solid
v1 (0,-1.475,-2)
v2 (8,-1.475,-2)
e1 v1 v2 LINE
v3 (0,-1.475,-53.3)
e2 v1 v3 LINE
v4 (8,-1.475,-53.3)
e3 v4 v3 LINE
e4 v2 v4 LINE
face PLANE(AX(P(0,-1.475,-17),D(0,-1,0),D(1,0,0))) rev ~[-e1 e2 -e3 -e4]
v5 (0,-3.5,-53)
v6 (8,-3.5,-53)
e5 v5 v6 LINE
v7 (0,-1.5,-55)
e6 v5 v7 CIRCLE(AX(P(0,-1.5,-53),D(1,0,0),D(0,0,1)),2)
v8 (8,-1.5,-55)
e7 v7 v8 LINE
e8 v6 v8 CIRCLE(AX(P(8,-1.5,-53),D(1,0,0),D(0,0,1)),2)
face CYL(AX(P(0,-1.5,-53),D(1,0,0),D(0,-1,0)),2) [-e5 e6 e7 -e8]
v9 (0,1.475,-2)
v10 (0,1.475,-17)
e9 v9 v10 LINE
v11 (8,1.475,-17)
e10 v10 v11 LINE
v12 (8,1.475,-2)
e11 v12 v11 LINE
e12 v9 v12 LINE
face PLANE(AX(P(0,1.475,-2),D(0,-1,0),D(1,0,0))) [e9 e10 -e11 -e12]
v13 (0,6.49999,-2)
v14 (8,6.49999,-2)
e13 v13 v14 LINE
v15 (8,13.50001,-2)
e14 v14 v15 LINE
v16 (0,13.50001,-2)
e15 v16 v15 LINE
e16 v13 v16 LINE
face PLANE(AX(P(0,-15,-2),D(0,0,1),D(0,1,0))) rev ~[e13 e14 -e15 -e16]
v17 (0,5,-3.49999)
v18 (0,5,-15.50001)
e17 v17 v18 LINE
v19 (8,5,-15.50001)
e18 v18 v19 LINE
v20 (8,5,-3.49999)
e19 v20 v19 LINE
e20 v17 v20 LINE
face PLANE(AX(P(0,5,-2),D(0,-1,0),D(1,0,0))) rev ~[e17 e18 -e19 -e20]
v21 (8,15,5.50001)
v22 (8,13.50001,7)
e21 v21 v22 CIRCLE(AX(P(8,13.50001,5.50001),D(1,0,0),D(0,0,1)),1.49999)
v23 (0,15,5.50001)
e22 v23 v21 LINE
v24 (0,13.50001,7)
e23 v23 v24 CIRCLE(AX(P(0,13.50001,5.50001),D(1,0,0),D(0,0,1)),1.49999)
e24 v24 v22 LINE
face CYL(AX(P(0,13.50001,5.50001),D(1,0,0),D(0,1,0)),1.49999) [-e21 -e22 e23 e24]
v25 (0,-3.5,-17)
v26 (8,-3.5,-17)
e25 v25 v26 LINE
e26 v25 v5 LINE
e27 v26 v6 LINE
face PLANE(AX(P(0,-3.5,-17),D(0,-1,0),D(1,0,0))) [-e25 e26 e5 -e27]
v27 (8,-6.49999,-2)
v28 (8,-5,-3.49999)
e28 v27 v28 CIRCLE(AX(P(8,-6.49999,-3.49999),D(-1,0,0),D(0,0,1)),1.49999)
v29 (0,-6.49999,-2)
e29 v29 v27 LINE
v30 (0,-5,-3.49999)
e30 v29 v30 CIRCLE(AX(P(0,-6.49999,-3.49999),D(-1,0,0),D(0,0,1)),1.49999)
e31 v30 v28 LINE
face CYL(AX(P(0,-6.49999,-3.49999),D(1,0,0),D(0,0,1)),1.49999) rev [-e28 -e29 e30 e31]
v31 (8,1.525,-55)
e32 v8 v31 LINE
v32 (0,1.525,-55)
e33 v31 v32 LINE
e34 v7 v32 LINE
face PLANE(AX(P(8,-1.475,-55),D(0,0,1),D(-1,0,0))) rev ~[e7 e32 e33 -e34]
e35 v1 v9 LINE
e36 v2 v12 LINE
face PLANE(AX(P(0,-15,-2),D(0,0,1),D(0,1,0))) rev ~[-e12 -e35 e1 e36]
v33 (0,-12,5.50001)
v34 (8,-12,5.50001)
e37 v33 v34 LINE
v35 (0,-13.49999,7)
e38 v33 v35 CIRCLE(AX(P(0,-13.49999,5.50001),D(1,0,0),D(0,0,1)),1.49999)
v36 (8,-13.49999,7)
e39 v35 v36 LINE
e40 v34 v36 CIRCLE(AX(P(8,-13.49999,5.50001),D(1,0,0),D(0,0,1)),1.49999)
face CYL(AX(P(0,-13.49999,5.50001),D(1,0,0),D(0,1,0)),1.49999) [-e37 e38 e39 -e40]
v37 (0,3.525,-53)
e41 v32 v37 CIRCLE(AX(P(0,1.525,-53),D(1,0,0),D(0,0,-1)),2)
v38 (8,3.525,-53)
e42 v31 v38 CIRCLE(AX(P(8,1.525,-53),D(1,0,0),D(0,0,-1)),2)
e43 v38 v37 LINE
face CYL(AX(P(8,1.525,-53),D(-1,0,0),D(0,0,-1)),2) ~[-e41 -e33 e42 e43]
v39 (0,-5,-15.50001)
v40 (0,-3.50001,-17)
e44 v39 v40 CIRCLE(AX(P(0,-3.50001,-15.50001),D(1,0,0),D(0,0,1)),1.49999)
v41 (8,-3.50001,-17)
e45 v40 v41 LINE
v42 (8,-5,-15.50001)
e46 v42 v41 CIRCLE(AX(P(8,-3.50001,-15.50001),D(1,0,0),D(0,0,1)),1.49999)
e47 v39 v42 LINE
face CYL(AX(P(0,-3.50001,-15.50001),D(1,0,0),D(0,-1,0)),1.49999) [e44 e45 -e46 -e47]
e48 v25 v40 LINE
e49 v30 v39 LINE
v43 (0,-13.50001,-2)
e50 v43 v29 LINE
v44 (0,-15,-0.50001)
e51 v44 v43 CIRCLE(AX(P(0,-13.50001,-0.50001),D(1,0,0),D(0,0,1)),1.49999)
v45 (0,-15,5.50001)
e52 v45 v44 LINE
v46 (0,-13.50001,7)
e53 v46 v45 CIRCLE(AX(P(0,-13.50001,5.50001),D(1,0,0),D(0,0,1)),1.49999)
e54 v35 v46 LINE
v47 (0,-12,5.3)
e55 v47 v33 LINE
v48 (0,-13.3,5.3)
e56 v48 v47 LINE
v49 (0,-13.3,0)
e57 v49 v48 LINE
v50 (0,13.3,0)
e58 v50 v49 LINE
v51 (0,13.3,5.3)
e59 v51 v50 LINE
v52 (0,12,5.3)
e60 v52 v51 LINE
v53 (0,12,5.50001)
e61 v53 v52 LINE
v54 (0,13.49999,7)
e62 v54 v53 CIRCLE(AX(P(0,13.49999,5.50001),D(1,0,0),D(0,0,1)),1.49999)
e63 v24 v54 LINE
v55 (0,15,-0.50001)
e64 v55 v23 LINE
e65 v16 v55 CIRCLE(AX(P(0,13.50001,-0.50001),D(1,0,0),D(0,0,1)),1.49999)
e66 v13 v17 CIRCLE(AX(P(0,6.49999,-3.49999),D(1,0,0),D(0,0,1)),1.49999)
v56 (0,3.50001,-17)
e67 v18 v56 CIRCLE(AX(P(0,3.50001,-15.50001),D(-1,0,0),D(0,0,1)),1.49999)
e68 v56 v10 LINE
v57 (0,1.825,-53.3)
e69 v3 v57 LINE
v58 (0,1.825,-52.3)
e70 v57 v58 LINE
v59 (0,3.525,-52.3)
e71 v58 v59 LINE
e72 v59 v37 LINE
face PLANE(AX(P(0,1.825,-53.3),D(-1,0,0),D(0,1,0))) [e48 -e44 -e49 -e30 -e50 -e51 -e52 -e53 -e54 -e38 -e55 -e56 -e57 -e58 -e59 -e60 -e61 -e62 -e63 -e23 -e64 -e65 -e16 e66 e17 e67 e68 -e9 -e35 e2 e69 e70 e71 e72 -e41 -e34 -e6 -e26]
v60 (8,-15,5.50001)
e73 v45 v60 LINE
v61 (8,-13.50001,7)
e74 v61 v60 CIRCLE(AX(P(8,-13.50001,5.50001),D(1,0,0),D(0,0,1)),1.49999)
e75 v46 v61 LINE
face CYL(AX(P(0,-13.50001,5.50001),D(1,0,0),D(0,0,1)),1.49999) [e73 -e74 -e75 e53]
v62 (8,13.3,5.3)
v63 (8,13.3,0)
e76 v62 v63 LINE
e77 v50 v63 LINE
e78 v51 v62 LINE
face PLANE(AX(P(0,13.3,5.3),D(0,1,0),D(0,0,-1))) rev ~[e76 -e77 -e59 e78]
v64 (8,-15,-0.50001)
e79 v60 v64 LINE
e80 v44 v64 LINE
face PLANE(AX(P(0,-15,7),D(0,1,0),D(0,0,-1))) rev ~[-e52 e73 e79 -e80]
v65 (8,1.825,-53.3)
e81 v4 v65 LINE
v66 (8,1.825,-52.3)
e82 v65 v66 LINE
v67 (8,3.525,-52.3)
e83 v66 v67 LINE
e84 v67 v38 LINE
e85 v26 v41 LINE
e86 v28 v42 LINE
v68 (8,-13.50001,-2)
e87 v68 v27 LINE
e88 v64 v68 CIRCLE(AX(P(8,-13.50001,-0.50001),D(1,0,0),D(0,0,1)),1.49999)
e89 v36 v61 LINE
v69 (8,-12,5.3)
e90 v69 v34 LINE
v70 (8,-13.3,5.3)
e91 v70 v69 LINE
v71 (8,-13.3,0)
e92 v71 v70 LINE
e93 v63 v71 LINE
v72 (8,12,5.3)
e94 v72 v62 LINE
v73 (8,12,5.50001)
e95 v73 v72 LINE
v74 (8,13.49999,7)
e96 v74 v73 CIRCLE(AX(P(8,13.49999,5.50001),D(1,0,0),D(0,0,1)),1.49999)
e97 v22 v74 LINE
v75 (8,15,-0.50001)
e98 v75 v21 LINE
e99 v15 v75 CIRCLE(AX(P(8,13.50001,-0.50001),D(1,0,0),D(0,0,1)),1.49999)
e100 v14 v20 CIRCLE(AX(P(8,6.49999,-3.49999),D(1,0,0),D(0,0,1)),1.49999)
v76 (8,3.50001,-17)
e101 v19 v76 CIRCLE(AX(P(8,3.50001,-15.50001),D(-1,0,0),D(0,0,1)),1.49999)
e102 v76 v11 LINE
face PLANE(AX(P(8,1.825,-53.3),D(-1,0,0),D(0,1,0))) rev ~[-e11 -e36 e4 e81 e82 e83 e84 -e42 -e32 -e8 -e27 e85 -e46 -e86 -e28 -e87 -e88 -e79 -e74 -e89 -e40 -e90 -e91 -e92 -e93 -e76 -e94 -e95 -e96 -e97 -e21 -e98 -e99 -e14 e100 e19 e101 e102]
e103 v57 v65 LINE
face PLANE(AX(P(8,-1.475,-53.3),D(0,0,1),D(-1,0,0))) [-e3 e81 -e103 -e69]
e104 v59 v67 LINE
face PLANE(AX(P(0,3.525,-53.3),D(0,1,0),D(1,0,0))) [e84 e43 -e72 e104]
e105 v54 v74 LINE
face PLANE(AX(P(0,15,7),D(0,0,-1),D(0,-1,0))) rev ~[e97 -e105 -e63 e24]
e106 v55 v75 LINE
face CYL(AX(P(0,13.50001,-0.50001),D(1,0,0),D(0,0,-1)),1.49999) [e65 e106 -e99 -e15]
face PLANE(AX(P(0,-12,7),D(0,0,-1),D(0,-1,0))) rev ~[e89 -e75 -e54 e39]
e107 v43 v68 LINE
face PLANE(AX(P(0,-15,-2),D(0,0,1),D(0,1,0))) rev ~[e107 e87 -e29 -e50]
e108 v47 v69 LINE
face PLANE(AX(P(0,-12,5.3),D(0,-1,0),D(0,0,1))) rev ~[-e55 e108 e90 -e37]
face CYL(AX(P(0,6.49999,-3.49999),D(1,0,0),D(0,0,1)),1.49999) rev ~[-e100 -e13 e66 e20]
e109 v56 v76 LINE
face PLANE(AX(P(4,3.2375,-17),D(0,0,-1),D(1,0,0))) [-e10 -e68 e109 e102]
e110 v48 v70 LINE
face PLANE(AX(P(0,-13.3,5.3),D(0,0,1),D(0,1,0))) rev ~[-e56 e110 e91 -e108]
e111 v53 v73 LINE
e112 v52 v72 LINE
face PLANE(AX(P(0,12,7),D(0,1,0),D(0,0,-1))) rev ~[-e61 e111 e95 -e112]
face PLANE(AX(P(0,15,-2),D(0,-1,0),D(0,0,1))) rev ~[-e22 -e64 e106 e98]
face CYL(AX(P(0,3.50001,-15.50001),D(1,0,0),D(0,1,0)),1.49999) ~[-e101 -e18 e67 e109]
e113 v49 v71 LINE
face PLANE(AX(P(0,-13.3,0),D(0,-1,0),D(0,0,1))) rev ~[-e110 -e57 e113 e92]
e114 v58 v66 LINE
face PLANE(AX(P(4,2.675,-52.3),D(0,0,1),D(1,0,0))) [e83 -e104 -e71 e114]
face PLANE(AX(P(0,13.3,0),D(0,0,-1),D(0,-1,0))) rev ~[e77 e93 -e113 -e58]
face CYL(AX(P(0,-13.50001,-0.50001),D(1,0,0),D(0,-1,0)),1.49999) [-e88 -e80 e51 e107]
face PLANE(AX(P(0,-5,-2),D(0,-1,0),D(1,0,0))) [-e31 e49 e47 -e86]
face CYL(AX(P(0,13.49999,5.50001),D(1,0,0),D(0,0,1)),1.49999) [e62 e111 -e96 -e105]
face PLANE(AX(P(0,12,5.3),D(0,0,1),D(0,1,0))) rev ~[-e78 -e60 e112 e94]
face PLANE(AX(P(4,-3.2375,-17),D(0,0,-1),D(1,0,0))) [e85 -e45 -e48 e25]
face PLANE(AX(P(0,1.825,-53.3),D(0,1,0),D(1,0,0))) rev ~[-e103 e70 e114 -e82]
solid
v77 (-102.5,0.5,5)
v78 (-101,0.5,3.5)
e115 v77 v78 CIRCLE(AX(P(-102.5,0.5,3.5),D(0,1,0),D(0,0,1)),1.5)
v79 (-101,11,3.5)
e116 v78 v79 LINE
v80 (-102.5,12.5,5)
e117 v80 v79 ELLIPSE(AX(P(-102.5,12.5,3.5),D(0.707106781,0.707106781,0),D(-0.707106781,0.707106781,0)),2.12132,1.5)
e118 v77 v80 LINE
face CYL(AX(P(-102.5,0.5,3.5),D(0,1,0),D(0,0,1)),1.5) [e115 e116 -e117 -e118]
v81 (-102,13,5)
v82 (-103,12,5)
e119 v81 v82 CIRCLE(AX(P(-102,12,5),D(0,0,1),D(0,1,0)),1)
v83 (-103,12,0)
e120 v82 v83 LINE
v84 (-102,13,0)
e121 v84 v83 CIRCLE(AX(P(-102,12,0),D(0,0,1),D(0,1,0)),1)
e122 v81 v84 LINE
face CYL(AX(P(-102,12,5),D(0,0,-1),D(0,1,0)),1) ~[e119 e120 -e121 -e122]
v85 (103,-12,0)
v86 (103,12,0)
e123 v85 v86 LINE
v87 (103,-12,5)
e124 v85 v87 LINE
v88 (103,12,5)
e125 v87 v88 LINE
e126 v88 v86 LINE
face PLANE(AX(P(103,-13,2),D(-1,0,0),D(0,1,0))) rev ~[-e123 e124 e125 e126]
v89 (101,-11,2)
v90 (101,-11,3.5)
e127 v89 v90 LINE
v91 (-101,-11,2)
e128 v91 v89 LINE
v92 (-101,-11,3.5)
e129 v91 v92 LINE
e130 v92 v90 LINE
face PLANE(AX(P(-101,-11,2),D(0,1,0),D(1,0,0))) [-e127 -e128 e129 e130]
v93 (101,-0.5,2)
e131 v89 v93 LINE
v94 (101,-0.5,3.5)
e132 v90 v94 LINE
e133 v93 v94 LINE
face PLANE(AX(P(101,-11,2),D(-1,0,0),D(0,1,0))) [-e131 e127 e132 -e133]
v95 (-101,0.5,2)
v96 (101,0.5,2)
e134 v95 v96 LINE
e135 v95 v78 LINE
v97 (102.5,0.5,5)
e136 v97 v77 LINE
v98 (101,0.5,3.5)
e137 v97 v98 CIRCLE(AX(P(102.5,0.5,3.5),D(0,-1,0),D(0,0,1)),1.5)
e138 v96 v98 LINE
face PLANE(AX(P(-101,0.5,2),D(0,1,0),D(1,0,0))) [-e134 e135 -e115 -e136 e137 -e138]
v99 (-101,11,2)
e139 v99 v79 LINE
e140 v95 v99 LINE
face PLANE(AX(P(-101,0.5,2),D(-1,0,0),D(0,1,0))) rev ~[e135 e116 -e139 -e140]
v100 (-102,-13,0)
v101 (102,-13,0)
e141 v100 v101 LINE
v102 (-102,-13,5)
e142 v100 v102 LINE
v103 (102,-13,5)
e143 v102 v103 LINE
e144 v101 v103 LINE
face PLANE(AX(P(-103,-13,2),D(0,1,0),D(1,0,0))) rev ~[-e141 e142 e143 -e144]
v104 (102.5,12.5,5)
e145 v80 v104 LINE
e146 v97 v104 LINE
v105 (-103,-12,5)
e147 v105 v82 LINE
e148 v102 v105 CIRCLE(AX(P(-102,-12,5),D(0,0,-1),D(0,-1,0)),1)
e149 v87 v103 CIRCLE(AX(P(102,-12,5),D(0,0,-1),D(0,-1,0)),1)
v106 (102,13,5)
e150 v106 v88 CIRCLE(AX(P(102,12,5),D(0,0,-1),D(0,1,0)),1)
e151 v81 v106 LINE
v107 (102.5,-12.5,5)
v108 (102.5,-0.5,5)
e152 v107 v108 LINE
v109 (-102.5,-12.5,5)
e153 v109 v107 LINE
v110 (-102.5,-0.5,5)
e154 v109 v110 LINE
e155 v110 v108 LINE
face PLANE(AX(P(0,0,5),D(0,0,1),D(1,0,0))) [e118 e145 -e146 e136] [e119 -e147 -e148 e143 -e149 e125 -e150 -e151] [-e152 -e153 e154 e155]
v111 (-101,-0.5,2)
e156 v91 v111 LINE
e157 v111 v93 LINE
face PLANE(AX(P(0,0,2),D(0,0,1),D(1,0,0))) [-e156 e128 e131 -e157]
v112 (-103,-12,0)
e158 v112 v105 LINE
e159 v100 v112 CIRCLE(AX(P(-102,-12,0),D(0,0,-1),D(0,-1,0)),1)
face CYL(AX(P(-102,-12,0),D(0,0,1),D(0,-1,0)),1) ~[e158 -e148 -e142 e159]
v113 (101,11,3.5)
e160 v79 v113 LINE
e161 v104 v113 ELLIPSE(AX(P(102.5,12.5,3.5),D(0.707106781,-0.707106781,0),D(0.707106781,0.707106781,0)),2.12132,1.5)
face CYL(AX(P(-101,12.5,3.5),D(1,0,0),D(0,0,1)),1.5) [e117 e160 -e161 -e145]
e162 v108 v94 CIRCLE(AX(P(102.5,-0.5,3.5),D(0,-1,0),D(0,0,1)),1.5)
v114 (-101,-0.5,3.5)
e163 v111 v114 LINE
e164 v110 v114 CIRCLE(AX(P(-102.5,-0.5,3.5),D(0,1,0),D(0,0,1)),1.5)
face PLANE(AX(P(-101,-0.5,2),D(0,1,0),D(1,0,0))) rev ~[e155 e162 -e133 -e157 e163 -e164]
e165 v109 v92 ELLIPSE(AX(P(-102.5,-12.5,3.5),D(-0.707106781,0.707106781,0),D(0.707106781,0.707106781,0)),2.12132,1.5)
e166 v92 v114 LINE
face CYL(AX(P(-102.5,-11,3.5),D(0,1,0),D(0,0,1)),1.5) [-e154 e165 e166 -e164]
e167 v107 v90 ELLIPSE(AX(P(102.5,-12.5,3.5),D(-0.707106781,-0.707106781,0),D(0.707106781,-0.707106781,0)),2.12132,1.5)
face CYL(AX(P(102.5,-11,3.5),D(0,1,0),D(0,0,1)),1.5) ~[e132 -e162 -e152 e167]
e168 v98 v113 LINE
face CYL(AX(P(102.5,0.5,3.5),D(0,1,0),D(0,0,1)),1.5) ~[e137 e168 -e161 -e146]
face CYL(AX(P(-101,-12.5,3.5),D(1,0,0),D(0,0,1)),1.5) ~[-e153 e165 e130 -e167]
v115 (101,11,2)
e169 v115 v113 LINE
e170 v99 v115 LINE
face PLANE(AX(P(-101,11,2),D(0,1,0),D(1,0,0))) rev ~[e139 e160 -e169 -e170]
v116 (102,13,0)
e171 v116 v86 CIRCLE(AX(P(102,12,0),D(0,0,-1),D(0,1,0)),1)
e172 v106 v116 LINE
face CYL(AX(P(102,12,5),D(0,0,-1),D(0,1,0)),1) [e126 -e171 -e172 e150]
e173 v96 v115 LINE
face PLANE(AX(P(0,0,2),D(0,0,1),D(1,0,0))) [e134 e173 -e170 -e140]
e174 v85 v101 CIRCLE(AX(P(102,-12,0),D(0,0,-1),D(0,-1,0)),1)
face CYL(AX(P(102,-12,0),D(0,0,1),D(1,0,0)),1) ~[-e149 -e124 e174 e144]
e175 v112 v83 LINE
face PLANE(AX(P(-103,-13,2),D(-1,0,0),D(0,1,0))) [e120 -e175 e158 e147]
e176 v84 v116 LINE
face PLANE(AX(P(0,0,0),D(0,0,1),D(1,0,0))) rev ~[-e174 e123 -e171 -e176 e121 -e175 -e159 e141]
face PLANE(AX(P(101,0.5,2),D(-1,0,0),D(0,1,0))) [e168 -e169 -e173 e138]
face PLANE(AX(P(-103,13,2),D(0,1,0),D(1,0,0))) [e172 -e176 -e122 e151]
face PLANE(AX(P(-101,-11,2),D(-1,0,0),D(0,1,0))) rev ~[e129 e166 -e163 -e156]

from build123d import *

# Parameters (mm, degrees)
F0_W      = 206
F0_H      = 26
F1_DEPTH  = 2
F2_W      = 206
F2_H      = 26
F2_W_2    = 202
F2_H_2    = 10.5
F3_DEPTH  = 3
F4_R      = 1.5
F5_R      = 1
F7_DEPTH  = 8
F8_W      = 8
F8_H      = 3.525
F9_DEPTH  = 15
F10_R     = 1.49999
F11_W     = 8
F11_H     = 2.025
F12_DEPTH = 38
F13_W     = 8
F13_H     = 1.7
F14_DEPTH = 5
F15_W     = 8
F15_H     = 1.7
F16_DEPTH = 1
F17_R     = 2


# Not quite as in the source:
# - a fillet or chamfer is up to 0.001 mm smaller than in the source, because OpenCascade refuses the exact size


with BuildPart() as f1:
    # F0 (on Top) → F1 (new body)
    with BuildSketch(Plane.XY):
        Rectangle(F0_W, F0_H)
    extrude(amount=F1_DEPTH)

    # F2 (on face) → F3 (join)
    with BuildSketch(Plane.XY.offset(2)):
        Rectangle(F2_W, F2_H)
        with Locations((0, -5.75)):
            Rectangle(F2_W_2, F2_H_2, mode=Mode.SUBTRACT)
        with Locations((0, 5.75)):
            Rectangle(F2_W_2, F2_H_2, mode=Mode.SUBTRACT)
    extrude(amount=F3_DEPTH)

    # F4
    f4_edges = [f1.edges().sort_by_distance(p)[0] for p in [
        (-101, 5.75, 5),
        (0, 11, 5),
        (-101, -5.75, 5),
        (0, -11, 5),
        (101, 5.75, 5),
        (101, -5.75, 5),
    ]]
    fillet(f4_edges, radius=F4_R)

    # F5
    f5_edges = [f1.edges().sort_by_distance(p)[0] for p in [
        (103, 13, 2.5),
        (103, -13, 2.5),
        (-103, -13, 2.5),
        (-103, 13, 2.5),
    ]]
    fillet(f5_edges, radius=F5_R)


with BuildPart() as f7:
    # F6 (on Right) → F7 (new body)
    with BuildSketch(Plane.YZ):
        Polygon((13, 0), (12, 0), (-12, 0), (-13, 0), (-13.3, 0), (-13.3, 5.3), (-12, 5.3), (-12, 7), (-15, 7), (-15, -2), (-12, -2), (12, -2), (15, -2), (15, 7), (12, 7), (12, 5.3), (13.3, 5.3), (13.3, 0), align=None)
    extrude(amount=F7_DEPTH)

    # F8 (on face) → F9 (join)
    with BuildSketch(Plane(origin=(0, 0, -2), x_dir=(1, 0, 0), z_dir=(0, 0, -1))):
        with Locations((4, 3.2375)):
            Rectangle(F8_W, F8_H)
        with Locations((4, -3.2375)):
            Rectangle(F8_W, F8_H)
    extrude(amount=F9_DEPTH)

    # F10 (radius 1.5 in the source; OpenCascade refuses exactly that, so slightly less here)
    f10_edges = [f7.edges().sort_by_distance(p)[0] for p in [
        (4, -15, 7),
        (4, -15, -2),
        (4, 15, 7),
        (4, 15, -2),
        (4, 5, -2),
        (4, -5, -2),
        (4, -5, -17),
        (4, 5, -17),
        (4, -12, 7),
        (4, 12, 7),
    ]]
    fillet(f10_edges, radius=F10_R)

    # F11 (on face) → F12 (join)
    with BuildSketch(Plane(origin=(0, 0, -17), x_dir=(1, 0, 0), z_dir=(0, 0, -1))):
        with Locations((4, 2.4875)):
            Rectangle(F11_W, F11_H)
    extrude(amount=F12_DEPTH)

    # F13 (on face) → F14 (join)
    with BuildSketch(Plane(origin=(0, -1.475, 0), x_dir=(-1, 0, 0), z_dir=(0, 1, 0))):
        with Locations((-4, -54.15)):
            Rectangle(F13_W, F13_H)
    extrude(amount=F14_DEPTH)

    # F15 (on face) → F16 (join)
    with BuildSketch(Plane.XY.offset(-53.3)):
        with Locations((4, 2.675)):
            Rectangle(F15_W, F15_H)
    extrude(amount=F16_DEPTH)

    # F17
    f17_edges = [f7.edges().sort_by_distance(p)[0] for p in [
        (4, 3.525, -55),
        (4, -3.5, -55),
    ]]
    fillet(f17_edges, radius=F17_R)


solid = Compound([f1.part, f7.part])
